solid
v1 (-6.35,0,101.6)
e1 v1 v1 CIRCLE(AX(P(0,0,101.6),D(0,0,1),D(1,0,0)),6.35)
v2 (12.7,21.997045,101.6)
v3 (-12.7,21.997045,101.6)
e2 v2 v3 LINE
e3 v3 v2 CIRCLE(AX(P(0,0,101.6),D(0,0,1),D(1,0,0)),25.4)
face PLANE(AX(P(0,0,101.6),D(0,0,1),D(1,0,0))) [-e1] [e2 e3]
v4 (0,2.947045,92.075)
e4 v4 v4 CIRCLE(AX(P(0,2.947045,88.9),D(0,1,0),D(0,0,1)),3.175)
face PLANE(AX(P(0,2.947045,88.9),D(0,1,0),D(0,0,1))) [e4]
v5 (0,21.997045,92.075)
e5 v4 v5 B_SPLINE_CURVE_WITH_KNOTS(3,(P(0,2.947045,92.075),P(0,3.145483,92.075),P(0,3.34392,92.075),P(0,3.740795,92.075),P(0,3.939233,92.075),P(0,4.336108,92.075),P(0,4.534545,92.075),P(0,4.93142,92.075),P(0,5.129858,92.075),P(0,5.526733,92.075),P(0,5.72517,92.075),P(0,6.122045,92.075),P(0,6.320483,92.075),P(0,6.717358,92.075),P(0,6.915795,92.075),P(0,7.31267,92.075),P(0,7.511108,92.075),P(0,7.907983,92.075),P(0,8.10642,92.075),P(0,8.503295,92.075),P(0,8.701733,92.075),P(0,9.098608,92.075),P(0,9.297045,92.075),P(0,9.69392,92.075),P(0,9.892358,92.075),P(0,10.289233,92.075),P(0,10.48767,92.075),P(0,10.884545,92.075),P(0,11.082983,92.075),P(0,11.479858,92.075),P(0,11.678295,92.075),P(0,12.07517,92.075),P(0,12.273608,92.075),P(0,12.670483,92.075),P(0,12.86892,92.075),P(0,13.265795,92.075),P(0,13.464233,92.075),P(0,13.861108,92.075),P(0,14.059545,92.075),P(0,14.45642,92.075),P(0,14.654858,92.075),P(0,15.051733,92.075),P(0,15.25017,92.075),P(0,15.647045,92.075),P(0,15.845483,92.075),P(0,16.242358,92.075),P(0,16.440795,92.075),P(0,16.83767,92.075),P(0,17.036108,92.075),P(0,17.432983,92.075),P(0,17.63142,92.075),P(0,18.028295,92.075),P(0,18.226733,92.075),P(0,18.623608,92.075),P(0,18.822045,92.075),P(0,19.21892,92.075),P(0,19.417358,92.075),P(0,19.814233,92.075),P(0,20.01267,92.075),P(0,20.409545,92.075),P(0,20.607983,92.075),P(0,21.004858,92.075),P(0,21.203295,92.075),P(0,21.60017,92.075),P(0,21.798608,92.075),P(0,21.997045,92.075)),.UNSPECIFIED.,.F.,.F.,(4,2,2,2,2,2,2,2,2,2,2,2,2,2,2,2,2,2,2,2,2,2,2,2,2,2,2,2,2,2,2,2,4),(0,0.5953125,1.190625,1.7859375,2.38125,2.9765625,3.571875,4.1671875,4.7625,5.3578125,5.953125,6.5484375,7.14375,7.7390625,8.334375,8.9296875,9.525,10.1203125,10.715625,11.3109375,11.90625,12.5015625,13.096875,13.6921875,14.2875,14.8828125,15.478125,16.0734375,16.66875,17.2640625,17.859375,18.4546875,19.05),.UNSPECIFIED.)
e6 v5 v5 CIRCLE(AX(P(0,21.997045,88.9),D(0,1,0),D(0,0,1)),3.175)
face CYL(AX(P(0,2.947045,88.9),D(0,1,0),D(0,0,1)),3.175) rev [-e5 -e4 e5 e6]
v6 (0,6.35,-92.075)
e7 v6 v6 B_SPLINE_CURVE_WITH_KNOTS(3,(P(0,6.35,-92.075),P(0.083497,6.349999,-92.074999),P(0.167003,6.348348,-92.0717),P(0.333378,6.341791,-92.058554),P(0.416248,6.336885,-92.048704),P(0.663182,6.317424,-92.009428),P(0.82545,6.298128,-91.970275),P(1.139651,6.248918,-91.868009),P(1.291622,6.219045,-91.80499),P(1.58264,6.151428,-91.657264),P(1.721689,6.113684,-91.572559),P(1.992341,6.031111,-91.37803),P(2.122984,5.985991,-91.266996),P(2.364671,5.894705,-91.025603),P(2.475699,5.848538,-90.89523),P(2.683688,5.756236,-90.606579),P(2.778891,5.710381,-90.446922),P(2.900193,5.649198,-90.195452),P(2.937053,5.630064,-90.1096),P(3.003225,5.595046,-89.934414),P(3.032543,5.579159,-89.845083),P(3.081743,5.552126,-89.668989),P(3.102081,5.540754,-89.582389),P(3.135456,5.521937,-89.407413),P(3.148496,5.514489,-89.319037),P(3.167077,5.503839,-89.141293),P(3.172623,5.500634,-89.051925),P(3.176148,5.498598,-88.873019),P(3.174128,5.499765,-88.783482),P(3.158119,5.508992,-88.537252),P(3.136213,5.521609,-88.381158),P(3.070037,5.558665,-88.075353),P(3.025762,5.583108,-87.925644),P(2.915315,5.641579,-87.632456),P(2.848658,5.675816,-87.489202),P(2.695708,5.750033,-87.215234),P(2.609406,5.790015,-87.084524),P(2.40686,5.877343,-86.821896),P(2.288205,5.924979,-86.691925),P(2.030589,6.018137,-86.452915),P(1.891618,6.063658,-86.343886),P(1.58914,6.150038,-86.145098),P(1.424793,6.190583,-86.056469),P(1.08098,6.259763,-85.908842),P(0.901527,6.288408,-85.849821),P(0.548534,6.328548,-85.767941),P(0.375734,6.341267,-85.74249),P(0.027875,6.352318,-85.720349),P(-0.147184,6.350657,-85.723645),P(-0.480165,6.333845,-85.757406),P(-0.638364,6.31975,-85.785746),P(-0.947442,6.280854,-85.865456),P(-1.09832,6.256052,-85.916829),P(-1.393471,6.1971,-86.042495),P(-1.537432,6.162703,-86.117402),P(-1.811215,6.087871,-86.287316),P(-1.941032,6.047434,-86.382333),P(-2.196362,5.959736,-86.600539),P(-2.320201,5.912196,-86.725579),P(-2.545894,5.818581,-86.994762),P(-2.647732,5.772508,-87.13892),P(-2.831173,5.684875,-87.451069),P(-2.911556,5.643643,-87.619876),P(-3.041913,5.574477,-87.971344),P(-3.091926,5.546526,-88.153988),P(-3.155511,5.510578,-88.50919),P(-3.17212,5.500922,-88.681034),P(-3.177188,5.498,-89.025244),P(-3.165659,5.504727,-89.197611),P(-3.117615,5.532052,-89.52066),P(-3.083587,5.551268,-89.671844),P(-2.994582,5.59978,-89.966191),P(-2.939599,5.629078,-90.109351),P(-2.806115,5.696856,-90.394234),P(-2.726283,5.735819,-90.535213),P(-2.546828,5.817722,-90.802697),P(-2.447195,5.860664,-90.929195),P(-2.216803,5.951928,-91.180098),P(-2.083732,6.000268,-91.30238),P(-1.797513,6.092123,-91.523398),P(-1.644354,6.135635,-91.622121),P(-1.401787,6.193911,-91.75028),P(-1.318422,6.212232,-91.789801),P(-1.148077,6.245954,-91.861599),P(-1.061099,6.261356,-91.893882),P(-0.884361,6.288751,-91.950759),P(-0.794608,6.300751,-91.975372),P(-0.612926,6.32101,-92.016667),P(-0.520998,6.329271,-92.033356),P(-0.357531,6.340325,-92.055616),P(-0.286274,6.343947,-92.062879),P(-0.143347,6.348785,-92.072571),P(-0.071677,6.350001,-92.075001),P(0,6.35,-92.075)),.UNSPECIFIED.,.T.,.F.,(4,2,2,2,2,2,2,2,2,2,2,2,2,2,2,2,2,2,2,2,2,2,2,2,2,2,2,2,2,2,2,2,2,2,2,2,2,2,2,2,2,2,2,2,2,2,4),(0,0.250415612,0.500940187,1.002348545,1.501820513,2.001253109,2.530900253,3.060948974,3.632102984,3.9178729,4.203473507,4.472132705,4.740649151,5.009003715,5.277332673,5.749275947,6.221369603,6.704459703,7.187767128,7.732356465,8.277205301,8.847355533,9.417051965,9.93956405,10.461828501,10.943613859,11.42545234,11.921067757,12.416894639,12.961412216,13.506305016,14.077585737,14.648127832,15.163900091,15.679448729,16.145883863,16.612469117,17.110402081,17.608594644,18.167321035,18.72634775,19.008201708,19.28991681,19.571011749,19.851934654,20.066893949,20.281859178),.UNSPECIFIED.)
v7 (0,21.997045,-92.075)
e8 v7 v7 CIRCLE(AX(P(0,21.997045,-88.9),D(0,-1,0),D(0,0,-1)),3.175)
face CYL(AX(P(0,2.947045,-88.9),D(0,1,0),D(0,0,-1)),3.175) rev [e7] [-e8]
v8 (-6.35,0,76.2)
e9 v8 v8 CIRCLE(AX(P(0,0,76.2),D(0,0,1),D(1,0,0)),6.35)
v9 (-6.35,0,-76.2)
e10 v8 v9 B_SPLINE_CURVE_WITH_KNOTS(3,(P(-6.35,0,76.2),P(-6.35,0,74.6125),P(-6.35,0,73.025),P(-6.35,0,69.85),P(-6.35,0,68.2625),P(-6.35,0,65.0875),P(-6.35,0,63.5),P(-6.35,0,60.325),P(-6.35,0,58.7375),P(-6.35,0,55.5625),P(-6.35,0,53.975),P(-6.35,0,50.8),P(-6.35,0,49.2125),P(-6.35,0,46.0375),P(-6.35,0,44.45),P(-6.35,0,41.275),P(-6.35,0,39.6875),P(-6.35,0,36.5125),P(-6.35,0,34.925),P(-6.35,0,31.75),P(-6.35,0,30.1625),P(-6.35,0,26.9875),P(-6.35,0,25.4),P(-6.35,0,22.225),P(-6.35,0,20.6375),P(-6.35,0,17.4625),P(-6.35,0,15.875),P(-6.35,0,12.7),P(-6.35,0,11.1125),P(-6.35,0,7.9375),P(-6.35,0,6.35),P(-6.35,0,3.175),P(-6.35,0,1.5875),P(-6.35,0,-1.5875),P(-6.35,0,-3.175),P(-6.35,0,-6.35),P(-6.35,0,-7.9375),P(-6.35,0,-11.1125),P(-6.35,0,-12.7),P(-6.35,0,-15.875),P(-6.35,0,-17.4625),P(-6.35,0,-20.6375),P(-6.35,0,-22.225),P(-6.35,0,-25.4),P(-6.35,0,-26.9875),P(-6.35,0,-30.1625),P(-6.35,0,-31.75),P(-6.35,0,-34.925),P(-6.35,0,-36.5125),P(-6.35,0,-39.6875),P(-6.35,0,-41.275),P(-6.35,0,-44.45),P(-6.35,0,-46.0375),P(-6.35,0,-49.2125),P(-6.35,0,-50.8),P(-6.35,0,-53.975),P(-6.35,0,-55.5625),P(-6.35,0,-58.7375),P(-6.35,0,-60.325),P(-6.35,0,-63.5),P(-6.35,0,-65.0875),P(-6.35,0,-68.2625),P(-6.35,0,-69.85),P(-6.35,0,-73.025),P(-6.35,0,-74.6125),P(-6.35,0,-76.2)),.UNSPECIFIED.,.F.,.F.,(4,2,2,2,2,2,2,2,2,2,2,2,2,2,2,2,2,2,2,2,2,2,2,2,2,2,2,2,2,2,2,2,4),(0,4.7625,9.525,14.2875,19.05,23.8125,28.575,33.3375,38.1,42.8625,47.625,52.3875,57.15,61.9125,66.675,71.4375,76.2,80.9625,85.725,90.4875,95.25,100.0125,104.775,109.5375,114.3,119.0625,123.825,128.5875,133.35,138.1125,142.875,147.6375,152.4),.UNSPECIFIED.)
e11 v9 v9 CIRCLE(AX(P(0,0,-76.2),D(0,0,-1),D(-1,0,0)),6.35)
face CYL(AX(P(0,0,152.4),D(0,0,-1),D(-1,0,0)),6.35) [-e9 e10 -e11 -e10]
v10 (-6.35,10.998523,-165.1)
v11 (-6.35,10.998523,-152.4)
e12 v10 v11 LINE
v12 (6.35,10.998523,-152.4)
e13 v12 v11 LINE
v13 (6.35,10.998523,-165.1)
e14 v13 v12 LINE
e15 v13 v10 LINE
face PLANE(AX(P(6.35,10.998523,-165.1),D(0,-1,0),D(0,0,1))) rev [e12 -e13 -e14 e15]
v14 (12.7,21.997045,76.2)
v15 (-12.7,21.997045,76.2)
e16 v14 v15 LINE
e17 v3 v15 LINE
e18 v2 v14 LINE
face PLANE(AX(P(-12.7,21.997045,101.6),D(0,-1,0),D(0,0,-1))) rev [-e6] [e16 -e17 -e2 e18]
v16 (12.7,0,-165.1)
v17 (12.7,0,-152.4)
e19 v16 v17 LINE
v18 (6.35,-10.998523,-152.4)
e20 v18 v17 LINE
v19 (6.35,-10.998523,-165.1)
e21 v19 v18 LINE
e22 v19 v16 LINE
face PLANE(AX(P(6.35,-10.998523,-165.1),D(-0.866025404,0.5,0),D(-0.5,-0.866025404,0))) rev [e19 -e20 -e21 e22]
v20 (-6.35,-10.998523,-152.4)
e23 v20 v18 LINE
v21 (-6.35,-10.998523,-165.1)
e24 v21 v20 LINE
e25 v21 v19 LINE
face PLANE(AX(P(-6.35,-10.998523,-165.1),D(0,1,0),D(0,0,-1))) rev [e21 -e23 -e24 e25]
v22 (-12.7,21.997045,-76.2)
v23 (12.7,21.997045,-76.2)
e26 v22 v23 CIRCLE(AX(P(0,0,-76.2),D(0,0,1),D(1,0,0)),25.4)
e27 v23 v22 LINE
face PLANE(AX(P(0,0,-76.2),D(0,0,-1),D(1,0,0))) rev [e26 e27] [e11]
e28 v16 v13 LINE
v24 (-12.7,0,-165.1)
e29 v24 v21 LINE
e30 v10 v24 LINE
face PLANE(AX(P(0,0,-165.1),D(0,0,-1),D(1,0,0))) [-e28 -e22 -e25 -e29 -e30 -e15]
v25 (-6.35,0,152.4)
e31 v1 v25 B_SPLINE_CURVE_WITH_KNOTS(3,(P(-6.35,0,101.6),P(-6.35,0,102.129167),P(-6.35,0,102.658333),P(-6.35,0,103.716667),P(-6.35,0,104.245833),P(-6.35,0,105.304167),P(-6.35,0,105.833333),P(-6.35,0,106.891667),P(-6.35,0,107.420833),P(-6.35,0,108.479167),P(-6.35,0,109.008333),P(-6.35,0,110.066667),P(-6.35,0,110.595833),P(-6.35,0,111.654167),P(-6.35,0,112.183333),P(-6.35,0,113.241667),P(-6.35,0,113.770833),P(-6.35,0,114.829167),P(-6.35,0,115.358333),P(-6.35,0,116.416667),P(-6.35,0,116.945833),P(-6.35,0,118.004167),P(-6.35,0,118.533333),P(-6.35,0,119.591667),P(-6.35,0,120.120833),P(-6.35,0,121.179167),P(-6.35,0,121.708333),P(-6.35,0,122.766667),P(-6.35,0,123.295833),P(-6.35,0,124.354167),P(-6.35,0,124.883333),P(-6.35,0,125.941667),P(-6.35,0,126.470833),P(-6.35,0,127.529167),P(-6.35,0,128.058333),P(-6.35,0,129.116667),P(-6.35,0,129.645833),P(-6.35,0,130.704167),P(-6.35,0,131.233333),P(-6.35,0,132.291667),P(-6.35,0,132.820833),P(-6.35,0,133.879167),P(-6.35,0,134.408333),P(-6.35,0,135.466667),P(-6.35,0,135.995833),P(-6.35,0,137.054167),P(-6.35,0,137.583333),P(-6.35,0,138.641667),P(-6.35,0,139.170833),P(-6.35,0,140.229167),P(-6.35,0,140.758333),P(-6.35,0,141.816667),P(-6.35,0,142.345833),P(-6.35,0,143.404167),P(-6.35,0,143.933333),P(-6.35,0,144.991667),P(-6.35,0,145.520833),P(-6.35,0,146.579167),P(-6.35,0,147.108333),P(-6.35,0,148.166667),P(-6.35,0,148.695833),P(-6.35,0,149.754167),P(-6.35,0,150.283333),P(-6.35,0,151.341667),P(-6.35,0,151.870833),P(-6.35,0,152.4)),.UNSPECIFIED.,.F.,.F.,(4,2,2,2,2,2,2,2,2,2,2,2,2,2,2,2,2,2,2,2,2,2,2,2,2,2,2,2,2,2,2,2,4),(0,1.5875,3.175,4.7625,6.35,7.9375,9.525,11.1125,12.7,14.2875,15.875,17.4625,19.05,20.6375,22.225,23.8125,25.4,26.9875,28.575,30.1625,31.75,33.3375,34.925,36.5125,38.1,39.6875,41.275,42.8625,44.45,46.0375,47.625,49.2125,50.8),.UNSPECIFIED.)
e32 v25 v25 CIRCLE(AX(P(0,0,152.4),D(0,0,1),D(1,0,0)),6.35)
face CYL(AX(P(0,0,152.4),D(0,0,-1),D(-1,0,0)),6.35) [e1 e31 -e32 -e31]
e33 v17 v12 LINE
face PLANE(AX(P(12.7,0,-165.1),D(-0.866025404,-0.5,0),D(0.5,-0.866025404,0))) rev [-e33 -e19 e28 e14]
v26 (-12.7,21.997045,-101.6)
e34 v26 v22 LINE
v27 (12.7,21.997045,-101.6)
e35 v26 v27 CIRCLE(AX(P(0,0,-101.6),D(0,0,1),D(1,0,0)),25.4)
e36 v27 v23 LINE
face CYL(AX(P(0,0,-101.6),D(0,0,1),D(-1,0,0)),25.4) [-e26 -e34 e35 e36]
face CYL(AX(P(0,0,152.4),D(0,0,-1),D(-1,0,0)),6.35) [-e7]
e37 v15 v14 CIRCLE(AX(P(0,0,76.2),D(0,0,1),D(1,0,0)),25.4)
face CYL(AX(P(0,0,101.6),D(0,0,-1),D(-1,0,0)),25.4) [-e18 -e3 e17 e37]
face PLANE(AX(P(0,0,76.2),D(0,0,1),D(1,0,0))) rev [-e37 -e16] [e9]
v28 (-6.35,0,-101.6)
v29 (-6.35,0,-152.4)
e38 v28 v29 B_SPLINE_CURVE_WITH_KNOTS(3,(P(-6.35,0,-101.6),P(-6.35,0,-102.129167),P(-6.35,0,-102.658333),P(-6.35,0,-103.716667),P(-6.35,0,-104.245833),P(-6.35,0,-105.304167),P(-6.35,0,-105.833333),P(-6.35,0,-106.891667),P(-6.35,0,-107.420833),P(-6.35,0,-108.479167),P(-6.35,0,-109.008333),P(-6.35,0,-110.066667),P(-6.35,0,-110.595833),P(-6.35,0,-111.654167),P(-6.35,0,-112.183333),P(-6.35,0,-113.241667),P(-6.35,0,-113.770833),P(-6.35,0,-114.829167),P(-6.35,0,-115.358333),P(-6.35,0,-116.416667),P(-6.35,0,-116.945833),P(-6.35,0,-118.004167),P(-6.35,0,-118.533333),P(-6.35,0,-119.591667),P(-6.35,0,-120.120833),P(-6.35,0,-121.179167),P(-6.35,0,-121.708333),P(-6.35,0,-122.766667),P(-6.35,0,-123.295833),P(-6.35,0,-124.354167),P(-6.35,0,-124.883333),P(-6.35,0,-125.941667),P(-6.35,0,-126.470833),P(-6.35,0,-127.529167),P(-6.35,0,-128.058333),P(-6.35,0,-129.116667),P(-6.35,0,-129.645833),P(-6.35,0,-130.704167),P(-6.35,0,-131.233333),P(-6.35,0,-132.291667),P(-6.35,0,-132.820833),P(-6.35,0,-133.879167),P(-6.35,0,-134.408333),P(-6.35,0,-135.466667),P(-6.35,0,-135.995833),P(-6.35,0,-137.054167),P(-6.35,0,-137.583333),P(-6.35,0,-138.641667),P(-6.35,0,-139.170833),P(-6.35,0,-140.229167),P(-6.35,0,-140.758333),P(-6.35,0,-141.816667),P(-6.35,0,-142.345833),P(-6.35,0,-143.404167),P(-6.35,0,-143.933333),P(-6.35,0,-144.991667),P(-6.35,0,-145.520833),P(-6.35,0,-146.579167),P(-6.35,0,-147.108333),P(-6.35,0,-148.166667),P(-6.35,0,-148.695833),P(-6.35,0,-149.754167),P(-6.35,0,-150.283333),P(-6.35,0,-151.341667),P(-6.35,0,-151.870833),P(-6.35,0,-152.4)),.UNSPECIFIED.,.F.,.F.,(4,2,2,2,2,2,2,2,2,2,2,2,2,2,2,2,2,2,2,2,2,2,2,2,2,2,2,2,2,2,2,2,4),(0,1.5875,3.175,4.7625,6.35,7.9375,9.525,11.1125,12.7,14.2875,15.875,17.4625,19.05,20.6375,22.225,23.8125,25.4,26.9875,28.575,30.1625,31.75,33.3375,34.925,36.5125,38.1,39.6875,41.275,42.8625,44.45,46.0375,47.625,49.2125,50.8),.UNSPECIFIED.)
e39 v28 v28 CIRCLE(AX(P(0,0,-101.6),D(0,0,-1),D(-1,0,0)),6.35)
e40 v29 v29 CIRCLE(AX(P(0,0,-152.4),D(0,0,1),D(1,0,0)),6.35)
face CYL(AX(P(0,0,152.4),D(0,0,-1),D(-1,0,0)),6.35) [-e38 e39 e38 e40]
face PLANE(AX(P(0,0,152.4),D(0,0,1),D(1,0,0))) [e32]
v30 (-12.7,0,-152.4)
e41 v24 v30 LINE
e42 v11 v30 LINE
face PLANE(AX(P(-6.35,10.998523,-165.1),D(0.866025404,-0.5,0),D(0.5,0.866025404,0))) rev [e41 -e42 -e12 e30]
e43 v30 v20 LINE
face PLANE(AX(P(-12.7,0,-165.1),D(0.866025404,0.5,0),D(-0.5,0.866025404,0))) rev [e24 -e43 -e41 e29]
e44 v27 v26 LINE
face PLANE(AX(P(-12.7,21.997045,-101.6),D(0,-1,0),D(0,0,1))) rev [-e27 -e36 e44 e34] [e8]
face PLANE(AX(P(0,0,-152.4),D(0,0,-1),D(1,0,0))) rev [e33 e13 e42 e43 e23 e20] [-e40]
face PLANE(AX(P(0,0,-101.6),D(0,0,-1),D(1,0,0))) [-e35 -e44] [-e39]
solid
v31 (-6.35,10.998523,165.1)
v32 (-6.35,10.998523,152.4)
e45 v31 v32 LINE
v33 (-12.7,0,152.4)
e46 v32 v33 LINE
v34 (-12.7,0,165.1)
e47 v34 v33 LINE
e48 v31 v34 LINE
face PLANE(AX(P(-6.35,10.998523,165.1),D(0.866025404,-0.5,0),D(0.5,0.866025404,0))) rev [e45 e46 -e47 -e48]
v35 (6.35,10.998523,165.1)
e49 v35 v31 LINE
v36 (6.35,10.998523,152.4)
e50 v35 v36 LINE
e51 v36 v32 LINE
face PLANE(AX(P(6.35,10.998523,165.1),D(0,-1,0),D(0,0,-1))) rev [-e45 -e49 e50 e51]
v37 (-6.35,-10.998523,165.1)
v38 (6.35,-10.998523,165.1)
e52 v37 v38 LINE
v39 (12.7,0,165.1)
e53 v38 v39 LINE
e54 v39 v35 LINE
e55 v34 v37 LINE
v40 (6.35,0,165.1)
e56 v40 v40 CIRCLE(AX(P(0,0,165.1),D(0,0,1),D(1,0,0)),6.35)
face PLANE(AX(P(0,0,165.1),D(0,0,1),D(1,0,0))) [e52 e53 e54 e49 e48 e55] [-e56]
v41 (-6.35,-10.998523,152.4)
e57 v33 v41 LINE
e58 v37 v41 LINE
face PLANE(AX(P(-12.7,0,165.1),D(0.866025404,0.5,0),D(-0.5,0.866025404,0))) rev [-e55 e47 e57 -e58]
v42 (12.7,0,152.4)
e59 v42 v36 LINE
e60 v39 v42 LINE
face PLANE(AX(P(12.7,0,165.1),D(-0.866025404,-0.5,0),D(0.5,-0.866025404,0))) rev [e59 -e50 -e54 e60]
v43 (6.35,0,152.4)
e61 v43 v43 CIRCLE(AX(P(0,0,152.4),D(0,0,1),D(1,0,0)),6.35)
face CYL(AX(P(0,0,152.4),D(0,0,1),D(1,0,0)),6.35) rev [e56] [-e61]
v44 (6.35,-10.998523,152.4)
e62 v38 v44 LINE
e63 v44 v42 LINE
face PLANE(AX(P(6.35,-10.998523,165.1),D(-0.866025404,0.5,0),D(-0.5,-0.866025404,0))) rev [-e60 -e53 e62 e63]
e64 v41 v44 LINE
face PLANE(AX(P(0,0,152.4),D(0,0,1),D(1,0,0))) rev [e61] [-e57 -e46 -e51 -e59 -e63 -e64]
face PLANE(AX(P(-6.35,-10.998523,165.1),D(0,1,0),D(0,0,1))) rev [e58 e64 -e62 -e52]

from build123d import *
from OCP.BRepAlgoAPI import BRepAlgoAPI_Cut
from OCP.TopTools import TopTools_ListOfShape

# Parameters (mm, degrees)
SKETCH1_R           = 6.35
BOSS_EXTRUDE1_DEPTH = 152.4
BOSS_EXTRUDE2_DEPTH = 12.7
SKETCH3_R           = 6.35
CUT_EXTRUDE1_DEPTH  = 12.7
BOSS_EXTRUDE3_DEPTH = 25.4
SKETCH5_R           = 3.175
CUT_EXTRUDE2_DEPTH  = 19.05
MIRROR1_START       = -101.6
MIRROR1_OUTLINE_R   = 6.35
MIRROR1_DEPTH       = 25.4
MIRROR1_START_2     = -165.1
MIRROR1_2_DEPTH     = 12.7
MIRROR1_START_3     = 5.499260123
MIRROR1_3_OUTLINE_R = 3.175
MIRROR1_3_DEPTH     = 16.497785133
MIRROR1_START_4     = -93
MIRROR1_4_DEPTH     = 7.275


with BuildPart() as part:
    # Sketch1 → Boss-Extrude1 (new, symmetric)
    with BuildSketch(Plane.XY):
        with Locations(Location((0, 0, 0), (0, 0, 180))):
            Circle(SKETCH1_R)
    extrude(amount=BOSS_EXTRUDE1_DEPTH, both=True)

    # Sketch2 → Boss-Extrude2 (add)
    with BuildSketch(Plane.XY.offset(152.4)):
        Polygon((6.35, -10.998522628), (12.7, 0), (6.35, 10.998522628), (-6.35, 10.998522628), (-12.7, 0), (-6.35, -10.998522628), align=None)
    extrude(amount=BOSS_EXTRUDE2_DEPTH)

    # Sketch3 → Cut-Extrude1 (cut)
    with BuildSketch(Plane.XY.offset(165.1)):
        with Locations(Location((0, 0, 0), (0, 0, 180))):
            Circle(SKETCH3_R)
    extrude(amount=-CUT_EXTRUDE1_DEPTH, mode=Mode.SUBTRACT)


with BuildPart() as cut_extrude1_piece_1:
    # of the separate pieces the step leaves, piece 1, a body of its own (cut_extrude1_pieces)
    add(part.part.solids().sort_by_distance((-6.35, 0, -152.4))[0])

    # Sketch4 → Boss-Extrude3 (add)
    with BuildSketch(Plane.XY.offset(76.2)):
        with BuildLine():
            Line((-12.7, 21.997045256), (12.7, 21.997045256))
            ThreePointArc((12.7, 21.997045256), (0, -25.4), (-12.7, 21.997045256))
        make_face()
    extrude(amount=BOSS_EXTRUDE3_DEPTH)

    # Sketch5 → Cut-Extrude2 (cut)
    with BuildSketch(Plane(origin=(0, 21.997045256, 0), x_dir=(1, 0, 0), z_dir=(0, 1, 0))):
        with Locations(Location((0, -88.9, 0), (0, 0, 270))):
            Circle(SKETCH5_R)
    extrude(amount=-CUT_EXTRUDE2_DEPTH, mode=Mode.SUBTRACT)


with BuildPart() as cut_extrude1_piece_2:
    # of the separate pieces the step leaves, piece 2, a body of its own (cut_extrude1_pieces)
    add(part.part.solids().sort_by_distance((6.35, -10.998522628, 152.4))[0])


with BuildPart() as mirror1_tool:
    # Mirror1: read off the stored shape, not the designer's step
    # Mirror1 outline → Mirror1 (new body)
    with BuildSketch(Plane.XY.offset(MIRROR1_START)):
        with BuildLine():
            Line((12.7, 21.997045256), (-12.7, 21.997045256))
            ThreePointArc((-12.7, 21.997045256), (0, -25.4), (12.7, 21.997045256))
        make_face()
        Circle(MIRROR1_OUTLINE_R, mode=Mode.SUBTRACT)
    extrude(amount=MIRROR1_DEPTH)


with BuildPart() as cut_extrude1_piece_1_1:
    add(cut_extrude1_piece_1.part)


with BuildPart() as cut_extrude1_piece_1_2:
    # Mirror1: joined with mirror1_tool
    add(cut_extrude1_piece_1_1.part.fuse(mirror1_tool.part, tol=0.00001))


with BuildPart() as mirror1_2_tool:
    # Mirror1 2 outline → Mirror1 2 (new body)
    with BuildSketch(Plane.XY.offset(MIRROR1_START_2)):
        Polygon((-12.7, 0), (-6.35, -10.998522628), (6.35, -10.998522628), (12.7, 0), (6.35, 10.998522628), (-6.35, 10.998522628), align=None)
    extrude(amount=MIRROR1_2_DEPTH)


with BuildPart() as cut_extrude1_piece_1_3:
    add(cut_extrude1_piece_1_2.part)


with BuildPart() as cut_extrude1_piece_1_4:
    # Mirror1 2: joined with mirror1_2_tool
    add(cut_extrude1_piece_1_3.part.fuse(mirror1_2_tool.part, tol=0.00001))


with BuildPart() as mirror1_3_tool:
    # Mirror1 3 outline → Mirror1 3 (new body)
    with BuildSketch(Plane(origin=(0, 0, 0), x_dir=(1, 0, 0), z_dir=(0, 1, 0)).offset(MIRROR1_START_3)):
        with Locations((0, 88.9)):
            Circle(MIRROR1_3_OUTLINE_R)
    extrude(amount=MIRROR1_3_DEPTH)


with BuildPart() as cut_extrude1_piece_1_5:
    add(cut_extrude1_piece_1_4.part)

    # Mirror1 3: cut by mirror1_3_tool, with a tolerance
    mirror1_3_stock = TopTools_ListOfShape()
    mirror1_3_stock.Append(cut_extrude1_piece_1_5.part.wrapped)
    mirror1_3_tools = TopTools_ListOfShape()
    mirror1_3_tools.Append(mirror1_3_tool.part.wrapped)
    mirror1_3_cut = BRepAlgoAPI_Cut()
    mirror1_3_cut.SetArguments(mirror1_3_stock)
    mirror1_3_cut.SetTools(mirror1_3_tools)
    mirror1_3_cut.SetFuzzyValue(0.00001)
    mirror1_3_cut.Build()
    add(Compound.cast(mirror1_3_cut.Shape()).solids(), mode=Mode.REPLACE)


with BuildPart() as mirror1_4_tool:
    # Mirror1 4 outline → Mirror1 4 (new body)
    with BuildSketch(Plane.XY.offset(MIRROR1_START_4)):
        with BuildLine():
            ThreePointArc((3.175000516, 5.499261016), (0, 6.35), (-3.175000515, 5.499261016))
            Line((-3.175000515, 5.499261016), (3.175000516, 5.499261016))
        make_face()
    extrude(amount=MIRROR1_4_DEPTH)


with BuildPart() as cut_extrude1_piece_1_6:
    add(cut_extrude1_piece_1_5.part)


with BuildPart() as cut_extrude1_piece_1_7:
    # Mirror1 4: joined with mirror1_4_tool
    add(cut_extrude1_piece_1_6.part.fuse(mirror1_4_tool.part, tol=0.00001))


solid = Compound([cut_extrude1_piece_2.part, cut_extrude1_piece_1_7.part])
